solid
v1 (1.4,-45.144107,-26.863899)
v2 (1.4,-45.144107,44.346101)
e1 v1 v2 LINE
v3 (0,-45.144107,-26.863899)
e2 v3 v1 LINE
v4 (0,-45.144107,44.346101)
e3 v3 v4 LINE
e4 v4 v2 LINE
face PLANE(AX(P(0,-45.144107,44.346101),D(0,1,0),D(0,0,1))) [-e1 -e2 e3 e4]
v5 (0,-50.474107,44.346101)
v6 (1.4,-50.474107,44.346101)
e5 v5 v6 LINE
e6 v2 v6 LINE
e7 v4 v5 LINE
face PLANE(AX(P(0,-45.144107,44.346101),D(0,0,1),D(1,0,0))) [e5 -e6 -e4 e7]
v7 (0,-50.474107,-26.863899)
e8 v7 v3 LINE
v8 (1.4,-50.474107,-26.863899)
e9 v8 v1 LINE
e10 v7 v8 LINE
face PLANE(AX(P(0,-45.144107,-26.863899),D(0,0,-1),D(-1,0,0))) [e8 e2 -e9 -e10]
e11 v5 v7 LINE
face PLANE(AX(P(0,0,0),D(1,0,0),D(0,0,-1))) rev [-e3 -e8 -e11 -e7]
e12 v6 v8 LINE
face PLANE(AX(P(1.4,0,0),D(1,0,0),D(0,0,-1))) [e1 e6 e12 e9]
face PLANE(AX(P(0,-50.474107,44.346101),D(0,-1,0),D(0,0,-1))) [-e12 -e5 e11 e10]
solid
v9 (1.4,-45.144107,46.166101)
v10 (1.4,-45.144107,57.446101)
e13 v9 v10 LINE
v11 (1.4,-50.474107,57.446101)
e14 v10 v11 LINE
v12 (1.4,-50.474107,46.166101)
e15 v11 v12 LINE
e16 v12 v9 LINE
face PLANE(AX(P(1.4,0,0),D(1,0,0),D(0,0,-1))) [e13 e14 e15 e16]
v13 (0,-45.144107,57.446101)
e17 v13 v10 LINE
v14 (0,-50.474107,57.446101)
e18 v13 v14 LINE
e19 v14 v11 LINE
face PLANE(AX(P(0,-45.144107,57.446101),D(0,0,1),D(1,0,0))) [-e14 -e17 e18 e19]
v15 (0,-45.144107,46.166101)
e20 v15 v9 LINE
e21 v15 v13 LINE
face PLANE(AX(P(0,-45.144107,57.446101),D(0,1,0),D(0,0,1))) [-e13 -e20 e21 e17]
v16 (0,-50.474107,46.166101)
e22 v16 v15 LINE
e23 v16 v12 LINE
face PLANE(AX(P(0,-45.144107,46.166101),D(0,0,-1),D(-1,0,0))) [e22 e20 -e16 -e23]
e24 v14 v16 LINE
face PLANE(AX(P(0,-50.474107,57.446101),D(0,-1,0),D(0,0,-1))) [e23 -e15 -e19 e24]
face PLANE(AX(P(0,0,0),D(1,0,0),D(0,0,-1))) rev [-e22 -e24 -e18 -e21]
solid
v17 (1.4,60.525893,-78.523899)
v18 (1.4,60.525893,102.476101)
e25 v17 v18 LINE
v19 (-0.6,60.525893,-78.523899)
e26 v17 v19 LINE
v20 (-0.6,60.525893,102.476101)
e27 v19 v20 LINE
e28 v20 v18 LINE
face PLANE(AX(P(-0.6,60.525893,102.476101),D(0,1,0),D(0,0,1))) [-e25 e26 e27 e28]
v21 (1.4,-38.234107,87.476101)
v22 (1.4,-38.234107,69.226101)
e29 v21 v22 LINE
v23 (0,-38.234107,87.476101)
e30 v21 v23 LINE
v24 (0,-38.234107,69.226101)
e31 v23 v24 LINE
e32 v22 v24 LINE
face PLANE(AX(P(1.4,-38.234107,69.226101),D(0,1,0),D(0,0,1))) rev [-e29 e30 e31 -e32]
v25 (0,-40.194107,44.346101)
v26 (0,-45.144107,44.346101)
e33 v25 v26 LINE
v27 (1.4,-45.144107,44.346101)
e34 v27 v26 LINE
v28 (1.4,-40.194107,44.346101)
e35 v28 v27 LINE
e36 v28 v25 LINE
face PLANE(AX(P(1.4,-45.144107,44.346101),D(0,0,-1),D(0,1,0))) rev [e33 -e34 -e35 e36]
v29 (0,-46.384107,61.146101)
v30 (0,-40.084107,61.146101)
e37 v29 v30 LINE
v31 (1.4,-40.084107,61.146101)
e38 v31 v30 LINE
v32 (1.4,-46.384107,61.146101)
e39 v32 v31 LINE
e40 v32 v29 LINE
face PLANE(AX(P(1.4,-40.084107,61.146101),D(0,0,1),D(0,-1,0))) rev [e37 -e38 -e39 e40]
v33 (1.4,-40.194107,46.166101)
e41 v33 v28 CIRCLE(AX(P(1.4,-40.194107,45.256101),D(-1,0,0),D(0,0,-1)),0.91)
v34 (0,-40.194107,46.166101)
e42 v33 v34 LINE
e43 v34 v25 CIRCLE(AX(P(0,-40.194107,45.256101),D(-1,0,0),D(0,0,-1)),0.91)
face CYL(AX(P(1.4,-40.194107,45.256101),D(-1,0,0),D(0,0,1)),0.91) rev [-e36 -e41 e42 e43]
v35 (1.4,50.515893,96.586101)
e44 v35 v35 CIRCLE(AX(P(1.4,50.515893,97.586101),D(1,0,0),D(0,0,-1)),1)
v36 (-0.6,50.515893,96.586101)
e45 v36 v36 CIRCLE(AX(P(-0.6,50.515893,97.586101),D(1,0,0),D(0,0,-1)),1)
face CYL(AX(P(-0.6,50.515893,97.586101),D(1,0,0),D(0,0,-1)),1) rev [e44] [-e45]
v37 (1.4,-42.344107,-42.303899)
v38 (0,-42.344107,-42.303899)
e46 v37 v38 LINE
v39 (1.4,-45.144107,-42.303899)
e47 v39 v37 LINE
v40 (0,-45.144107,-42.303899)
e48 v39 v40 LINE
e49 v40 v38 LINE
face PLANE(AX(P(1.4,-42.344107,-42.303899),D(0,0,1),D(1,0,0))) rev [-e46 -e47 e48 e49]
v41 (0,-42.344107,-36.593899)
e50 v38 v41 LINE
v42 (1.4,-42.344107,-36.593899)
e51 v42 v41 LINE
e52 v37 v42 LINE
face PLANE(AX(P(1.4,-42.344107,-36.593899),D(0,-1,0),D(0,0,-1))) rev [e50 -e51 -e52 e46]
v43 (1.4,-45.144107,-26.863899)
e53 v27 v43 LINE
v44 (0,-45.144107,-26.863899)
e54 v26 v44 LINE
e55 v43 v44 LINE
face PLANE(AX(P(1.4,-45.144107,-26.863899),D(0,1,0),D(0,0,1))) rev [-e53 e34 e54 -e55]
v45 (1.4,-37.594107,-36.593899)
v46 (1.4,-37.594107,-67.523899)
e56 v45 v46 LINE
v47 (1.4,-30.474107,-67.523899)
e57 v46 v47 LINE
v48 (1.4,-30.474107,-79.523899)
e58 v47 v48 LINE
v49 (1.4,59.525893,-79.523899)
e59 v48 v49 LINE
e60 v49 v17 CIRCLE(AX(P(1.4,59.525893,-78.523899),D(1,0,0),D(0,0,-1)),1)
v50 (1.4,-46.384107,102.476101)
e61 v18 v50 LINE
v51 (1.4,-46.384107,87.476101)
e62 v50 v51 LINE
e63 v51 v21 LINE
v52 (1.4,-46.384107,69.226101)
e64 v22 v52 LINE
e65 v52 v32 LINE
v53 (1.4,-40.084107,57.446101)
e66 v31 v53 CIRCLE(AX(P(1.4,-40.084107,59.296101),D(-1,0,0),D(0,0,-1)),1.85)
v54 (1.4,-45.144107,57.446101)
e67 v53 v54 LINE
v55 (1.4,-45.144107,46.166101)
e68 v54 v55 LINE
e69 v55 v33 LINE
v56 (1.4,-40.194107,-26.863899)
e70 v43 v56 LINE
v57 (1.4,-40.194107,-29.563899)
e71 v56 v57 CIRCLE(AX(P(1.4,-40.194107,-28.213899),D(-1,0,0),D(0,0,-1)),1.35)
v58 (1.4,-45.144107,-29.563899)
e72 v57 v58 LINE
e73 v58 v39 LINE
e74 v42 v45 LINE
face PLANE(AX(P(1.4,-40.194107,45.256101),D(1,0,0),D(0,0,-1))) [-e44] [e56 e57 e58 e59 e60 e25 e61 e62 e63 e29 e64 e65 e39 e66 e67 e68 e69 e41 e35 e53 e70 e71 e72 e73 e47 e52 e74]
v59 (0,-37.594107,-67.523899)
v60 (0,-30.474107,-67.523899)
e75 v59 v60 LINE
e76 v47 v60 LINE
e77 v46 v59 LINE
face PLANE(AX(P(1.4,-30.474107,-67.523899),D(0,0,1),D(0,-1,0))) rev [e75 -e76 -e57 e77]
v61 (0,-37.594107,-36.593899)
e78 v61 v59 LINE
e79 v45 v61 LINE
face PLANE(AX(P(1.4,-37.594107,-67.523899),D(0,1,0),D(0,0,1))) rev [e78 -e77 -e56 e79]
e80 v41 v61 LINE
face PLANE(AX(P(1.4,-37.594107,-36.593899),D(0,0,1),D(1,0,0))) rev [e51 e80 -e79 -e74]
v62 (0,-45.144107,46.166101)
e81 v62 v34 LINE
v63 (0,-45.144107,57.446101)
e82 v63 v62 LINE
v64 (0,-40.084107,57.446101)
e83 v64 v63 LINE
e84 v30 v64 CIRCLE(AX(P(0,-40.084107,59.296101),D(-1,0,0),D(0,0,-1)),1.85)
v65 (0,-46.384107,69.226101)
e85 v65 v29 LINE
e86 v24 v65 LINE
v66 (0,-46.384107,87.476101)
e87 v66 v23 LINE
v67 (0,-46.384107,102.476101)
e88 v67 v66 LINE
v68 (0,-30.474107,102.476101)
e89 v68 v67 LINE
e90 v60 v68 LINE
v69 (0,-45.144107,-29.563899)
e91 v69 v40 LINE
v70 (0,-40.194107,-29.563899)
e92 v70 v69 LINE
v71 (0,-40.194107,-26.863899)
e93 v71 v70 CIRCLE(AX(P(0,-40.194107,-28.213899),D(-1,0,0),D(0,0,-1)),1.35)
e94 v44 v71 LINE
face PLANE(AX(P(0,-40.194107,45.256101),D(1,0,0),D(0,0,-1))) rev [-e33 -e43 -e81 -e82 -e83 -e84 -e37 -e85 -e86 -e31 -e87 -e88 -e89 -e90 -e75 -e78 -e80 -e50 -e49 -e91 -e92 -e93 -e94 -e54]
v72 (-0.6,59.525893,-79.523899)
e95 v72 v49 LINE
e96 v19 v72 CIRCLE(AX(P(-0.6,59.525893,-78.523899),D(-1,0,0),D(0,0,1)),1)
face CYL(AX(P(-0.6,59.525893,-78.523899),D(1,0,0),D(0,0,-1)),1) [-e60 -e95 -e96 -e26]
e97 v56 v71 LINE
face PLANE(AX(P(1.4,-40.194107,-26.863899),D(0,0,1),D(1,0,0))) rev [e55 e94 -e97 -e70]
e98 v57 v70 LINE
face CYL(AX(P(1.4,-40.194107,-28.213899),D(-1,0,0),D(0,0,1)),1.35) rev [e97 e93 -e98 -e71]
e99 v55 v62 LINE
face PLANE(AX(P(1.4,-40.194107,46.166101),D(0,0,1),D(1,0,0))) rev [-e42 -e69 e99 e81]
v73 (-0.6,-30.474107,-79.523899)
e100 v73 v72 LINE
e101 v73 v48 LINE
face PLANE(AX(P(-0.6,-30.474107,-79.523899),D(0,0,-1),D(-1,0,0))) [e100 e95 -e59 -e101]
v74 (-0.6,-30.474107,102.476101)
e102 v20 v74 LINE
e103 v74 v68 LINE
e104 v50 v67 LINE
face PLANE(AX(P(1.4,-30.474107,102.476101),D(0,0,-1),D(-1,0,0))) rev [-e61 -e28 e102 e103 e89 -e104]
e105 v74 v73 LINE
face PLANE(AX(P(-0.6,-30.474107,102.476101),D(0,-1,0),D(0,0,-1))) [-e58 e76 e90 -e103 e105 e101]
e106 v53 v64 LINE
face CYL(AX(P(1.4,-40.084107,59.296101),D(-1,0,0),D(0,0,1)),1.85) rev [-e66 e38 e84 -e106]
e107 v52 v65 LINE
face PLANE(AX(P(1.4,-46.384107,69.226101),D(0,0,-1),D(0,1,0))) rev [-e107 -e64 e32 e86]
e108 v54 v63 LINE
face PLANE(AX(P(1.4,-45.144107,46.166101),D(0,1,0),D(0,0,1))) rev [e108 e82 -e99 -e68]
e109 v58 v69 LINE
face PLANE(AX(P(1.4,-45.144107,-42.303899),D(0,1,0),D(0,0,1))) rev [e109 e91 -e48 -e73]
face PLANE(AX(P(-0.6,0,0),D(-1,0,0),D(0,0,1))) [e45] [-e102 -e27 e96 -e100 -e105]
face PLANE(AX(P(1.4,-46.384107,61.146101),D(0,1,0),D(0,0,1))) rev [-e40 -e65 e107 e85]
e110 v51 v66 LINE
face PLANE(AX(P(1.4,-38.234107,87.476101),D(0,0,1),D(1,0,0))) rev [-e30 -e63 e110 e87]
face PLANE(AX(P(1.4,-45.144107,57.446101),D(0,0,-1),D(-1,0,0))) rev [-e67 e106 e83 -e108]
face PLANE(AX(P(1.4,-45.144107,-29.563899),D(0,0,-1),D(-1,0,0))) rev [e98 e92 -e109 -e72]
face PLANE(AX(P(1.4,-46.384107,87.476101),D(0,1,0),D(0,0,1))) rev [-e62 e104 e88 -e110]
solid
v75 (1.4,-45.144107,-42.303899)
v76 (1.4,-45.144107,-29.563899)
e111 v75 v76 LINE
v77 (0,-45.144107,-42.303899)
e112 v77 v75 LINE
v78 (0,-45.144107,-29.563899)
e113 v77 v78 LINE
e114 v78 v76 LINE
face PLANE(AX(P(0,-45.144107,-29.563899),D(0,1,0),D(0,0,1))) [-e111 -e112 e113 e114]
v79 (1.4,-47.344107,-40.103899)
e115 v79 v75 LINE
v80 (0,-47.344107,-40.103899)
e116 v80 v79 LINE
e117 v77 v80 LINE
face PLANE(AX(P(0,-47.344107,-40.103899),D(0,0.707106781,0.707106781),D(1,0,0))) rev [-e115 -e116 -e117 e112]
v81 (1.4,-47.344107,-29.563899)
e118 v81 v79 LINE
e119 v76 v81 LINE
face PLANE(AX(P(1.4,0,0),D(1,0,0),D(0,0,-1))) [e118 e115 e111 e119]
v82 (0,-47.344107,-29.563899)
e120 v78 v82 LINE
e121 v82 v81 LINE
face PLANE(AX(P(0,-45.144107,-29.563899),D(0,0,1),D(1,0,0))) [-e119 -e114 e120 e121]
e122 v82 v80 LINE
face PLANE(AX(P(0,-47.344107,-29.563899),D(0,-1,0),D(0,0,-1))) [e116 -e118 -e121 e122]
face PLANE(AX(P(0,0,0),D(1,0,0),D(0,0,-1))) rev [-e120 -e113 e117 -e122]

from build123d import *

# Parameters (mm, degrees)
EXTRUDE_1_DEPTH        = 1.4
SKETCH_3_W             = 71.21
SKETCH_3_H             = 5.33
EXTRUDE_2_DEPTH        = 1.4
SKETCH_3_W_2           = 12.74
SKETCH_3_H_2           = 2.2
EXTRUDE_2_2_DEPTH      = 1.4
SKETCH_3_W_3           = 11.28
EXTRUDE_2_3_DEPTH      = 1.4
CHAMFER_1_SIZE         = 2.2
SKETCH_5_W             = 182
SKETCH_5_H             = 91
EXTRUDE_4_DEPTH        = 2
SKETCH_6_R             = 1
CUT_EXTRUDE_2689_DEPTH = 2
FILLET_1_R             = 1


with BuildPart() as part:
    # 草图1 → 凸台-拉伸1 (new body)
    with BuildSketch(Plane(origin=(0, 0, 0), x_dir=(0, 0, -1), z_dir=(1, 0, 0))):
        with BuildLine():
            Line((-102.476101343, -30.47410665), (-102.476101343, -46.38410665))
            Line((-102.476101343, -46.38410665), (-87.476101343, -46.38410665))
            Line((-87.476101343, -46.38410665), (-87.476101343, -38.23410665))
            Line((-87.476101343, -38.23410665), (-69.226101343, -38.23410665))
            Line((-69.226101343, -38.23410665), (-69.226101343, -46.38410665))
            Line((-69.226101343, -46.38410665), (-61.146101343, -46.38410665))
            Line((-61.146101343, -46.38410665), (-61.146101343, -40.08410665))
            ThreePointArc((-61.146101343, -40.08410665), (-59.296101343, -38.23410665), (-57.446101343, -40.08410665))
            Line((-57.446101343, -40.08410665), (-57.446101343, -45.14410665))
            Line((-57.446101343, -45.14410665), (-46.166101343, -45.14410665))
            Line((-46.166101343, -45.14410665), (-46.166101343, -40.19410665))
            ThreePointArc((-46.166101343, -40.19410665), (-45.256101343, -39.28410665), (-44.346101343, -40.19410665))
            Line((-44.346101343, -40.19410665), (-44.346101343, -45.14410665))
            Line((-44.346101343, -45.14410665), (26.863898657, -45.14410665))
            Line((26.863898657, -45.14410665), (26.863898657, -40.19410665))
            ThreePointArc((26.863898657, -40.19410665), (28.213898657, -38.84410665), (29.563898657, -40.19410665))
            Line((29.563898657, -40.19410665), (29.563898657, -45.14410665))
            Line((29.563898657, -45.14410665), (42.303898657, -45.14410665))
            Line((42.303898657, -45.14410665), (42.303898657, -42.34410665))
            Line((42.303898657, -42.34410665), (36.593898657, -42.34410665))
            Line((36.593898657, -42.34410665), (36.593898657, -37.59410665))
            Line((36.593898657, -37.59410665), (67.523898657, -37.59410665))
            Line((67.523898657, -37.59410665), (67.523898657, -30.47410665))
            Line((67.523898657, -30.47410665), (-102.476101343, -30.47410665))
        make_face()
    extrude(amount=EXTRUDE_1_DEPTH)

    # 草图5 → 凸台-拉伸4 (add)
    with BuildSketch(Plane(origin=(1.4, 0, 0), x_dir=(0, 0, -1), z_dir=(1, 0, 0))):
        with Locations((-11.476101343, 15.02589335)):
            Rectangle(SKETCH_5_W, SKETCH_5_H)
    extrude(amount=-EXTRUDE_4_DEPTH)

    # 草图6 → Cut-Extrude 2689 (cut)
    with BuildSketch(Plane(origin=(1.4, 0, 0), x_dir=(0, 0, -1), z_dir=(1, 0, 0))):
        with Locations((-97.586101343, 50.51589335)):
            Circle(SKETCH_6_R)
    extrude(amount=-CUT_EXTRUDE_2689_DEPTH, mode=Mode.SUBTRACT)

    # 圆角1
    fillet_1_edges = [part.edges().sort_by_distance(p)[0] for p in [
        (0.4, 60.52589335, -79.523898657),
    ]]
    fillet(fillet_1_edges, radius=FILLET_1_R)


with BuildPart() as body_2:
    # 草图3 → 凸台-拉伸2 (new body)
    with BuildSketch(Plane(origin=(1.4, 0, 0), x_dir=(0, 0, -1), z_dir=(1, 0, 0))):
        with Locations((-8.741101343, -47.80910665)):
            Rectangle(SKETCH_3_W, SKETCH_3_H)
    extrude(amount=-EXTRUDE_2_DEPTH)


with BuildPart() as body_3:
    # 草图3 → Extrude 2 2 (new body)
    with BuildSketch(Plane(origin=(1.4, 0, 0), x_dir=(0, 0, -1), z_dir=(1, 0, 0))):
        with Locations((35.933898657, -46.24410665)):
            Rectangle(SKETCH_3_W_2, SKETCH_3_H_2)
    extrude(amount=-EXTRUDE_2_2_DEPTH)

    # 倒角1
    chamfer_1_edges = [body_3.edges().sort_by_distance(p)[0] for p in [
        (0.7, -47.34410665, -42.303898657),
    ]]
    chamfer(chamfer_1_edges, length=CHAMFER_1_SIZE - 0.0001)  # a hair under: the kernel refuses the full size


with BuildPart() as body_4:
    # 草图3 → Extrude 2 3 (new body)
    with BuildSketch(Plane(origin=(1.4, 0, 0), x_dir=(0, 0, -1), z_dir=(1, 0, 0))):
        with Locations((-51.806101343, -47.80910665)):
            Rectangle(SKETCH_3_W_3, SKETCH_3_H)
    extrude(amount=-EXTRUDE_2_3_DEPTH)


solid = Compound([part.part, body_2.part, body_3.part, body_4.part])
